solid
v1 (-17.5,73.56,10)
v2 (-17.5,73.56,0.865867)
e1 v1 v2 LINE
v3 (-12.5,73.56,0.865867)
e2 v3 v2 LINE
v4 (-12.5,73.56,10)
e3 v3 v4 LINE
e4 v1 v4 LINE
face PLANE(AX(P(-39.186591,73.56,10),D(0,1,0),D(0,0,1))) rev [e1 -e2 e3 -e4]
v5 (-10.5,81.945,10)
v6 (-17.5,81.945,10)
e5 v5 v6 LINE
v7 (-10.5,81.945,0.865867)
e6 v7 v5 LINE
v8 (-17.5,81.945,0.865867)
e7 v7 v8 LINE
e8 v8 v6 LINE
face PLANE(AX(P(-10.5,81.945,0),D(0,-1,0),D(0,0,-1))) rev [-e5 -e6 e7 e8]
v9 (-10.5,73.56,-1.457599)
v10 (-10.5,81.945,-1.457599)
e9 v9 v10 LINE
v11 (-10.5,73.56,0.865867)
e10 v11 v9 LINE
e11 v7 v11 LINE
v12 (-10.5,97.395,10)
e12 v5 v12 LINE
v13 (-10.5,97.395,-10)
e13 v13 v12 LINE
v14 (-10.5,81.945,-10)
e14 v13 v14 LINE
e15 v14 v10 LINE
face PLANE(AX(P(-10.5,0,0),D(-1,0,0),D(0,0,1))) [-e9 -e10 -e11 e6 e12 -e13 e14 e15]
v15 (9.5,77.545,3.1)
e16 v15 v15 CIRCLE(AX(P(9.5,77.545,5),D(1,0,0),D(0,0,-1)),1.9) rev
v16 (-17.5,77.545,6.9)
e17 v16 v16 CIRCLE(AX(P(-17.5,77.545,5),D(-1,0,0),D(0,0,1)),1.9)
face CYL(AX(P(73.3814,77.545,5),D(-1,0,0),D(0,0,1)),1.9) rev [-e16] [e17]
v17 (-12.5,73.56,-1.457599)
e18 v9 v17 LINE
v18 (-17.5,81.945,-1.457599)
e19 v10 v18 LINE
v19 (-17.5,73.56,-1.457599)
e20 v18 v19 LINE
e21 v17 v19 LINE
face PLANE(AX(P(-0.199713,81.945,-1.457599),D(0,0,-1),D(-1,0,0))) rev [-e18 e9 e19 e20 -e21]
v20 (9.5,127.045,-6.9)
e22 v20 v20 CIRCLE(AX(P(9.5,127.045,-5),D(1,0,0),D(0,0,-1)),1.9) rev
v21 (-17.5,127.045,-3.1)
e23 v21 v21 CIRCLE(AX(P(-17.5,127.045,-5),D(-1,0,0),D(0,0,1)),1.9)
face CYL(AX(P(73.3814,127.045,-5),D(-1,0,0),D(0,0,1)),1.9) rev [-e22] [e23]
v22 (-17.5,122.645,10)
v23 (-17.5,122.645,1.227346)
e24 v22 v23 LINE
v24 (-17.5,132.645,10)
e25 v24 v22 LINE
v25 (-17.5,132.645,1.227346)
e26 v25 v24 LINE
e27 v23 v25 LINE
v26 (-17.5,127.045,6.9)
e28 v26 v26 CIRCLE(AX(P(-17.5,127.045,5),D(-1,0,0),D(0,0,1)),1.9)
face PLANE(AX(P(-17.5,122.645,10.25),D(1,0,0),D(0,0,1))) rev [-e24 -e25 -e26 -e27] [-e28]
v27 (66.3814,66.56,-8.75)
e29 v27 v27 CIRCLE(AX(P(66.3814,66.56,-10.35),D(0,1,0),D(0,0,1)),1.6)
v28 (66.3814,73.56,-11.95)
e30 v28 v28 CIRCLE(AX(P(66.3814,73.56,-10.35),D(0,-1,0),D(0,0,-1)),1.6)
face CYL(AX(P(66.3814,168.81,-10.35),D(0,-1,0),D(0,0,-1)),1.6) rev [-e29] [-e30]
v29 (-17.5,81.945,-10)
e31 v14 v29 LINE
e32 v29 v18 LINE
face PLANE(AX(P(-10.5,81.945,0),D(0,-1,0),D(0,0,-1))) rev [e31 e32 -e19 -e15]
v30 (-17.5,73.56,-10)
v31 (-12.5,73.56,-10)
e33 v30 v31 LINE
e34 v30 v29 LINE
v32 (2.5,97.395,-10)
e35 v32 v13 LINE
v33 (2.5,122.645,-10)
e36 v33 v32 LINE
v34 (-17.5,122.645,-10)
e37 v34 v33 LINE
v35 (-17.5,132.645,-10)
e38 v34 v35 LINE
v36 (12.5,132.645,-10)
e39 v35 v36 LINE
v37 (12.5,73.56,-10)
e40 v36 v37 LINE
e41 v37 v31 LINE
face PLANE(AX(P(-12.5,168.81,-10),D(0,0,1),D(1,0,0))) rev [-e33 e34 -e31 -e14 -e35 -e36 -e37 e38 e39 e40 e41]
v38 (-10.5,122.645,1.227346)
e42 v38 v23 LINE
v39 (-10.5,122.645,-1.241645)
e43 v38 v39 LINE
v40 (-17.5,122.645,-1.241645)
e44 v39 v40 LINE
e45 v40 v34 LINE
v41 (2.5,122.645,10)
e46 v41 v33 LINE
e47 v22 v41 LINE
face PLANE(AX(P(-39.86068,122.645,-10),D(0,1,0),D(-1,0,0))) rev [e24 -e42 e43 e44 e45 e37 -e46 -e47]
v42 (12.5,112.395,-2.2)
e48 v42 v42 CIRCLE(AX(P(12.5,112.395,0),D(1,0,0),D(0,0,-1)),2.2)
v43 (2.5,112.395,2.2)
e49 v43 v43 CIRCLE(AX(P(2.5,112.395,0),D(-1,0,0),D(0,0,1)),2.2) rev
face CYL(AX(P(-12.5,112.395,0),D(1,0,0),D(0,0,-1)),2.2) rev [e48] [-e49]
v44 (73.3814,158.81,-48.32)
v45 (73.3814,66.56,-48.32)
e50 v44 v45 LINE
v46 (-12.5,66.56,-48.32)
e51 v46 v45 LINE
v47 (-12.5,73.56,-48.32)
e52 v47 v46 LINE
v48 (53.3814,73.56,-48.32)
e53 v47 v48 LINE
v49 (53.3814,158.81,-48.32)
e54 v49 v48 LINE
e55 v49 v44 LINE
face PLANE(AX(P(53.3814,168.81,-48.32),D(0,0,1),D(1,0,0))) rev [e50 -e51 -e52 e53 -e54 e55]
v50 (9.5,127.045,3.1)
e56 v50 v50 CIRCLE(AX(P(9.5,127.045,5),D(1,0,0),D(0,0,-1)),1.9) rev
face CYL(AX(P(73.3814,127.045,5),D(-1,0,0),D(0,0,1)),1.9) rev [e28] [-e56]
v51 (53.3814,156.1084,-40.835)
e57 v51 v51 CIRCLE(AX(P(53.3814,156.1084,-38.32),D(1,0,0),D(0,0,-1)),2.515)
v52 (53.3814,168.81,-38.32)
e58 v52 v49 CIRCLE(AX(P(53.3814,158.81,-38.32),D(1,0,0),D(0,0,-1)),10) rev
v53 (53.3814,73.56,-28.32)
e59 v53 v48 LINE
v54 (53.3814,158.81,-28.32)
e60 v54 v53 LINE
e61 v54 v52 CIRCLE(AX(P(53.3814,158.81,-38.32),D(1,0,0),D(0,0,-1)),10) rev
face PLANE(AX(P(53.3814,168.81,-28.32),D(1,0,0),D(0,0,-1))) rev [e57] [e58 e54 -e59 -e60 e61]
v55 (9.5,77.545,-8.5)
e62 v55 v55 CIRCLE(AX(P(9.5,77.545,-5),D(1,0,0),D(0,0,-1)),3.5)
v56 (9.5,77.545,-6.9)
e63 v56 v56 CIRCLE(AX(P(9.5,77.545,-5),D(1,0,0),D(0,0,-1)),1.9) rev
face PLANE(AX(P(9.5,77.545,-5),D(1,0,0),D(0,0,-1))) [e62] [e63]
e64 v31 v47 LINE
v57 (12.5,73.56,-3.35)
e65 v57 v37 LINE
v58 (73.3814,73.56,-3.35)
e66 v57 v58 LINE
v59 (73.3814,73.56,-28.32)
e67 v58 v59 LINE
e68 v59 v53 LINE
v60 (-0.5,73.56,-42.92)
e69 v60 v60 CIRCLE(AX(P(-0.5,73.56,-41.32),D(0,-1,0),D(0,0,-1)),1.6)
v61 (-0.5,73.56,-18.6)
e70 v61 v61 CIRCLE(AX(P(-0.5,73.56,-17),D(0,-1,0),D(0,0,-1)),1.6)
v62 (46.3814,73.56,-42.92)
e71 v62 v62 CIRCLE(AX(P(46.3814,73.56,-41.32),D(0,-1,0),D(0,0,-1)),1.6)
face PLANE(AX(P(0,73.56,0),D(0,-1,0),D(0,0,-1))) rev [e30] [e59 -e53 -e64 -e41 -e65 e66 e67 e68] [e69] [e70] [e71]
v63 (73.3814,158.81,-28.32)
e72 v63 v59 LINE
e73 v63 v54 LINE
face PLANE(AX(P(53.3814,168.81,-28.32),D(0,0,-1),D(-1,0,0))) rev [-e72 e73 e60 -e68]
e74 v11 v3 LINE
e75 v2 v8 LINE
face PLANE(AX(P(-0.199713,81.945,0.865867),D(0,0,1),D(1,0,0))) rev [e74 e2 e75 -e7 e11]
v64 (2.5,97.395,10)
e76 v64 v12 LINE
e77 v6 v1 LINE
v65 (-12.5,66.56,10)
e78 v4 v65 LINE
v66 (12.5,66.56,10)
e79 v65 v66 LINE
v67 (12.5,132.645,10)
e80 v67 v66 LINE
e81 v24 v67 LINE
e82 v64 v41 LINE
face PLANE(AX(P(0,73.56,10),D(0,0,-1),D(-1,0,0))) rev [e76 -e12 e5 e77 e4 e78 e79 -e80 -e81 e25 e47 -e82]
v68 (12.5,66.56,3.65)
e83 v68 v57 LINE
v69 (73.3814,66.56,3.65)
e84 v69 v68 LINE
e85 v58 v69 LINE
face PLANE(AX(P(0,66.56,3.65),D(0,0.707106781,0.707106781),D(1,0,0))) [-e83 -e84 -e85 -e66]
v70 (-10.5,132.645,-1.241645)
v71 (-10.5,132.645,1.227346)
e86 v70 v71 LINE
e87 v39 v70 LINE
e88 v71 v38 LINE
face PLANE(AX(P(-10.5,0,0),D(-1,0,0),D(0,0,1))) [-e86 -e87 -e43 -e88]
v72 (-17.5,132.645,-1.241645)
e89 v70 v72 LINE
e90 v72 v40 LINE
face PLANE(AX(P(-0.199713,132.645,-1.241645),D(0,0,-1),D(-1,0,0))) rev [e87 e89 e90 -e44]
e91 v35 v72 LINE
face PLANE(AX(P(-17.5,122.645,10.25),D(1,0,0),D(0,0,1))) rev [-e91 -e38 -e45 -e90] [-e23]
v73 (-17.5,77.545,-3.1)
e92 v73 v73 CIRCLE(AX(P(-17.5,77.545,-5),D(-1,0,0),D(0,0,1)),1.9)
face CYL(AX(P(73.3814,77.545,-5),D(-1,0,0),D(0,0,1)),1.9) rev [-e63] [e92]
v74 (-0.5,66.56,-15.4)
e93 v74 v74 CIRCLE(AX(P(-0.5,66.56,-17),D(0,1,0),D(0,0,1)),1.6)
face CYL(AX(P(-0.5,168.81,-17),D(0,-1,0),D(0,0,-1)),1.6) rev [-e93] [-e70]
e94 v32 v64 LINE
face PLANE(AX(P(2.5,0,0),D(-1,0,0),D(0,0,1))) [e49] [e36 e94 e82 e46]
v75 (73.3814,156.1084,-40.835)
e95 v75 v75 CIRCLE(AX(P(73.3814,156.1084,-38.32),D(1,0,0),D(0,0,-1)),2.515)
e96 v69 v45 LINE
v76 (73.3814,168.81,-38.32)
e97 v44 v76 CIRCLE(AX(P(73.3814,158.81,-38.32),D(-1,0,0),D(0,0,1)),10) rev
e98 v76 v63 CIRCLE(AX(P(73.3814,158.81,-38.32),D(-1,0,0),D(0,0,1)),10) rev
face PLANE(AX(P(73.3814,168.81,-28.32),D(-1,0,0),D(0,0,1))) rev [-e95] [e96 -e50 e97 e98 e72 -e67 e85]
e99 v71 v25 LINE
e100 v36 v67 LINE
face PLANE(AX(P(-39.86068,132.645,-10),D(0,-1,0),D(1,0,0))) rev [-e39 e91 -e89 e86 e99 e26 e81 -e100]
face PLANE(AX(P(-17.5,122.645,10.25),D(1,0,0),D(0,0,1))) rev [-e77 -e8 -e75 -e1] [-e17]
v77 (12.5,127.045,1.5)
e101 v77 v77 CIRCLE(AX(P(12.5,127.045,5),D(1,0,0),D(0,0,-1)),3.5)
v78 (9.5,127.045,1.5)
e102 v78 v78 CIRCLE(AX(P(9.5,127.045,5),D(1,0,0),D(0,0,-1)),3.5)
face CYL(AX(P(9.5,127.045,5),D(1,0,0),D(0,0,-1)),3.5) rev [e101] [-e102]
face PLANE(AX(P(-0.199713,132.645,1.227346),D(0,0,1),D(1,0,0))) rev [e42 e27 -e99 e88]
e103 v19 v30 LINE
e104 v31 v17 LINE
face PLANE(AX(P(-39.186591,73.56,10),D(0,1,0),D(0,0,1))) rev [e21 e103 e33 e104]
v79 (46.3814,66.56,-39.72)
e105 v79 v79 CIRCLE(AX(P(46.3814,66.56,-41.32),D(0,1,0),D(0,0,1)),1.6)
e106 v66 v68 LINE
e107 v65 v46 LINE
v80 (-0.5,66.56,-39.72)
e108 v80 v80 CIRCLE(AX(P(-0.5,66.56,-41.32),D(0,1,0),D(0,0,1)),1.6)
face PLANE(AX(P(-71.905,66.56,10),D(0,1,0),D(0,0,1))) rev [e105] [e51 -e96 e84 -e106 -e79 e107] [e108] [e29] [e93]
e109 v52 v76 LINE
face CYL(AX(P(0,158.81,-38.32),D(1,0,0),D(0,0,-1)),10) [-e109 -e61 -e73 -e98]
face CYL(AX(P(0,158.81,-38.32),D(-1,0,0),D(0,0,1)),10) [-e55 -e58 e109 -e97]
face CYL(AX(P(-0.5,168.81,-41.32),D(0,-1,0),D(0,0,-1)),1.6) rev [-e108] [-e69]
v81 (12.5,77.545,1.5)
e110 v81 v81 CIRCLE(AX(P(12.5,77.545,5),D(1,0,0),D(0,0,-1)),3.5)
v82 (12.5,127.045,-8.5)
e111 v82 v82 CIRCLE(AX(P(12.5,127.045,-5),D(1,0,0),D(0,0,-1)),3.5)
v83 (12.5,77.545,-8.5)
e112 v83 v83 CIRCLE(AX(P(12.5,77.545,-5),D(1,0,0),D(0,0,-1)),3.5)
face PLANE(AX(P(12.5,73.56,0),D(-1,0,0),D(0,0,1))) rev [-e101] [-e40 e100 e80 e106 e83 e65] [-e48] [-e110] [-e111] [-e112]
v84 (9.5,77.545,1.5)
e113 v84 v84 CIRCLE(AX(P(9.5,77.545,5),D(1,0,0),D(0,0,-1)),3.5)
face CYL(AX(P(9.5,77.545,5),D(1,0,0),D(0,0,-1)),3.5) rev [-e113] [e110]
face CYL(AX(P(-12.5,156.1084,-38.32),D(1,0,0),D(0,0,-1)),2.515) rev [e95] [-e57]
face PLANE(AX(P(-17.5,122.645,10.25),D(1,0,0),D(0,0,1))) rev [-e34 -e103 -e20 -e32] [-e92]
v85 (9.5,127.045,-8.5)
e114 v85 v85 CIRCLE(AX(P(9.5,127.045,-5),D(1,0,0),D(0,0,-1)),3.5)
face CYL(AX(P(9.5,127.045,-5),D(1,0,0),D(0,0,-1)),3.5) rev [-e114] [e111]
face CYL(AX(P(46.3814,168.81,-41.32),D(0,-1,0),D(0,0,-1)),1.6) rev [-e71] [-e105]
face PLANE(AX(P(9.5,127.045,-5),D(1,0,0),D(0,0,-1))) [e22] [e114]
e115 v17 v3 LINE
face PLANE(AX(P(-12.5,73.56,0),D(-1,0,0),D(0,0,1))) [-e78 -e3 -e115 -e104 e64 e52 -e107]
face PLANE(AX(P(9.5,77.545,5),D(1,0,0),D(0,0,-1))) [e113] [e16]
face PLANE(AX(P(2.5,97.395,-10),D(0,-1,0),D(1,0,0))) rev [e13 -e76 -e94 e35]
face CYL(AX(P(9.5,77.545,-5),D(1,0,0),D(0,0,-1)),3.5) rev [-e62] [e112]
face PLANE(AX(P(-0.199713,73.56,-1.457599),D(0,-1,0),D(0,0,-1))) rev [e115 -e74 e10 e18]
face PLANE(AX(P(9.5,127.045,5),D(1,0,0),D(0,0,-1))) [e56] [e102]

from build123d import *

# Parameters (mm, degrees)
SKETCH1_W                = 25
SKETCH1_H                = 20
BOSS_EXTRUDE1_DEPTH      = 168.81
SKETCH1_W_2              = 20
BOSS_EXTRUDE1_2_DEPTH    = 168.81
CUT_EXTRUDE1_DEPTH       = 194.087721945
CUT_EXTRUDE1_DEPTH_BACK  = 194.087721945
SKETCH2_W                = 25
SKETCH2_H                = 44.708
FILLET2_R                = 10
CUT_EXTRUDE2_DEPTH       = 196.466757701
CUT_EXTRUDE2_DEPTH_BACK  = 196.466757701
SKETCH4_R                = 2.515
CUT_EXTRUDE3_DEPTH       = 186.844513952
CUT_EXTRUDE3_DEPTH_BACK  = 186.844513952
SKETCH3_R                = 2.2
SKETCH5_W                = 58.32
SKETCH5_H                = 66.56
CUT_EXTRUDE4_DEPTH       = 84.405
BOSS_EXTRUDE2_DEPTH      = 7
CHAMFER1_SIZE            = 7
SKETCH8_W                = 20
SKETCH8_H                = 13.858822584
SKETCH8_H_2              = 30.45
CUT_EXTRUDE6_DEPTH       = 2
SKETCH9_W                = 20
SKETCH9_H                = 31.847227872
CUT_EXTRUDE7_DEPTH       = 13
BOSS_EXTRUDE3_START      = -10
SKETCH10_W               = 20
SKETCH10_H               = 10
BOSS_EXTRUDE3_DEPTH      = 30
SKETCH11_W               = 20
SKETCH11_H               = 8.385
BOSS_EXTRUDE4_DEPTH      = 5
CUT_EXTRUDE8_DEPTH       = 135.813629748
CUT_EXTRUDE8_DEPTH_BACK  = 135.813629748
SKETCH12_R               = 1.6
CUT_EXTRUDE11_DEPTH      = 198.714610907
CUT_EXTRUDE11_DEPTH_BACK = 198.714610907
SKETCH13_R               = 1.9
SKETCH14_R               = 3.5
CUT_EXTRUDE12_DEPTH      = 3
CUT_EXTRUDE13_REACH      = 199.715
SKETCH16_W               = 2.468990405
SKETCH16_H               = 10
SKETCH16_W_2             = 2.323465518
SKETCH16_H_2             = 8.385


with BuildPart() as part:
    # Sketch1 → Boss-Extrude1 (new body)
    with BuildSketch(Plane(origin=(0, 0, 0), x_dir=(1, 0, 0), z_dir=(0, 1, 0))):
        Rectangle(SKETCH1_W, SKETCH1_H)
    extrude(amount=BOSS_EXTRUDE1_DEPTH)

    # Sketch2 → Cut-Extrude1 (cut, two sides: drawn at the far end of the back side and taken through both)
    with BuildSketch(Plane.XY.offset(10).offset(-CUT_EXTRUDE1_DEPTH_BACK)):
        with Locations((0, 146.456)):
            Rectangle(SKETCH2_W, SKETCH2_H)
    extrude(amount=CUT_EXTRUDE1_DEPTH + CUT_EXTRUDE1_DEPTH_BACK, mode=Mode.SUBTRACT)

    # Sketch3 → Cut-Extrude3 (cut, two sides: drawn at the far end of the back side and taken through both)
    with BuildSketch(Plane(origin=(12.5, 0, 0), x_dir=(0, 0, -1), z_dir=(1, 0, 0)).offset(-CUT_EXTRUDE3_DEPTH_BACK)):
        with Locations((0, 112.395)):
            Circle(SKETCH3_R)
    extrude(amount=CUT_EXTRUDE3_DEPTH + CUT_EXTRUDE3_DEPTH_BACK, mode=Mode.SUBTRACT)


with BuildPart() as body_2:
    # Sketch1 → Boss-Extrude1 2 (new body)
    with BuildSketch(Plane(origin=(0, 0, 0), x_dir=(1, 0, 0), z_dir=(0, 1, 0))):
        with Locations((63.3814, 38.32)):
            Rectangle(SKETCH1_W_2, SKETCH1_H)
    extrude(amount=BOSS_EXTRUDE1_2_DEPTH)

    # Fillet2
    fillet2_edges = [body_2.edges().sort_by_distance(p)[0] for p in [
        (63.3814, 168.81, -48.32),
        (63.3814, 168.81, -28.32),
    ]]
    fillet(fillet2_edges, radius=FILLET2_R - 0.0001)  # a hair under: the kernel refuses the full size

    # Sketch4 → Cut-Extrude2 (cut, two sides: drawn at the far end of the back side and taken through both)
    with BuildSketch(Plane(origin=(73.3814, 0, 0), x_dir=(0, 0, -1), z_dir=(1, 0, 0)).offset(-CUT_EXTRUDE2_DEPTH_BACK)):
        with Locations((38.32, 156.1084)):
            Circle(SKETCH4_R)
    extrude(amount=CUT_EXTRUDE2_DEPTH + CUT_EXTRUDE2_DEPTH_BACK, mode=Mode.SUBTRACT)


with BuildPart() as cut_extrude4_tool:
    # Sketch5 → Cut-Extrude4 (new, symmetric)
    with BuildSketch(Plane(origin=(12.5, 0, 0), x_dir=(0, 0, -1), z_dir=(1, 0, 0))):
        with Locations((19.16, 33.28)):
            Rectangle(SKETCH5_W, SKETCH5_H)
    extrude(amount=CUT_EXTRUDE4_DEPTH, both=True)


with BuildPart() as part_1:
    add(part.part)

    # Cut-Extrude4: cut by cut_extrude4_tool
    add(cut_extrude4_tool.part, mode=Mode.SUBTRACT)



with BuildPart() as body_2_1:
    add(body_2.part)

    # Cut-Extrude4: cut by cut_extrude4_tool
    add(cut_extrude4_tool.part, mode=Mode.SUBTRACT)


with BuildPart() as part_2:
    add(part_1.part)

    add(body_2_1.part)  # Boss-Extrude2 merges body 2
    # Sketch6 → Boss-Extrude2 (add)
    with BuildSketch(Plane.XZ.offset(-66.56)):
        Polygon((12.5, 10), (-12.5, 10), (-12.5, -48.32), (53.3814, -48.32), (53.3814, -28.32), (73.3814, -28.32), (73.3814, 3.65), (12.5, 3.65), align=None)
    extrude(amount=-BOSS_EXTRUDE2_DEPTH)

    # Chamfer1
    chamfer1_edges = [part_2.edges().sort_by_distance(p)[0] for p in [
        (42.9407, 73.56, 3.65),
    ]]
    chamfer(chamfer1_edges, length=CHAMFER1_SIZE - 0.0001)  # a hair under: the kernel refuses the full size

    # Sketch8 → Cut-Extrude6 (cut)
    with BuildSketch(Plane.ZY.offset(12.5)):
        with Locations((0, 119.324411292)):
            Rectangle(SKETCH8_W, SKETCH8_H)
        with Locations((0, 97.17)):
            Rectangle(SKETCH8_W, SKETCH8_H_2)
    extrude(amount=-CUT_EXTRUDE6_DEPTH, mode=Mode.SUBTRACT)

    # Sketch9 → Cut-Extrude7 (cut)
    with BuildSketch(Plane.ZY.offset(10.5)):
        with Locations((0, 113.318613936)):
            Rectangle(SKETCH9_W, SKETCH9_H)
    extrude(amount=-CUT_EXTRUDE7_DEPTH, mode=Mode.SUBTRACT)

    # Sketch10 → Boss-Extrude3 (add)
    with BuildSketch(Plane.ZY.offset(-2.5).offset(BOSS_EXTRUDE3_START)):
        with Locations((0, 127.645)):
            Rectangle(SKETCH10_W, SKETCH10_H)
    extrude(amount=BOSS_EXTRUDE3_DEPTH)

    # Sketch11 → Boss-Extrude4 (add)
    with BuildSketch(Plane.ZY.offset(12.5)):
        with Locations((0, 77.7525)):
            Rectangle(SKETCH11_W, SKETCH11_H)
    extrude(amount=BOSS_EXTRUDE4_DEPTH)

    # Sketch12 → Cut-Extrude8 (cut, two sides: drawn at the far end of the back side and taken through both)
    with BuildSketch(Plane.XZ.offset(-66.56).offset(-CUT_EXTRUDE8_DEPTH_BACK)):
        with Locations(Location((-0.5, -17, 0), (0, 0, 270))):
            Circle(SKETCH12_R)
        with Locations(Location((46.3814, -41.32, 0), (0, 0, 270))):
            Circle(SKETCH12_R)
        with Locations(Location((66.3814, -10.35, 0), (0, 0, 270))):
            Circle(SKETCH12_R)
        with Locations(Location((-0.5, -41.32, 0), (0, 0, 270))):
            Circle(SKETCH12_R)
    extrude(amount=CUT_EXTRUDE8_DEPTH + CUT_EXTRUDE8_DEPTH_BACK, mode=Mode.SUBTRACT)

    # Sketch13 → Cut-Extrude11 (cut, two sides: drawn at the far end of the back side and taken through both)
    with BuildSketch(Plane.ZY.offset(17.5).offset(-CUT_EXTRUDE11_DEPTH_BACK)):
        with Locations((-5, 127.045)):
            Circle(SKETCH13_R)
        with Locations((5, 127.045)):
            Circle(SKETCH13_R)
        with Locations((5, 77.545)):
            Circle(SKETCH13_R)
        with Locations((-5, 77.545)):
            Circle(SKETCH13_R)
    extrude(amount=CUT_EXTRUDE11_DEPTH + CUT_EXTRUDE11_DEPTH_BACK, mode=Mode.SUBTRACT)

    # Sketch14 → Cut-Extrude12 (cut)
    with BuildSketch(Plane(origin=(12.5, 0, 0), x_dir=(0, 0, -1), z_dir=(1, 0, 0))):
        with Locations((5, 127.045)):
            Circle(SKETCH14_R)
        with Locations((-5, 127.045)):
            Circle(SKETCH14_R)
        with Locations((-5, 77.545)):
            Circle(SKETCH14_R)
        with Locations((5, 77.545)):
            Circle(SKETCH14_R)
    extrude(amount=-CUT_EXTRUDE12_DEPTH, mode=Mode.SUBTRACT)

    # Cut-Extrude13: up to this face of the body (flat: up to its plane)
    cut_extrude13_end = Plane(part_2.part.faces().sort_by_distance((-10.5, 89.67, 0))[0])
    # Sketch16 → Cut-Extrude13 (cut, up to the picked face)
    with BuildSketch(Plane.ZY.offset(17.5), mode=Mode.PRIVATE) as cut_extrude13_sk1:
        with Locations((-0.007149366, 127.645)):
            Rectangle(SKETCH16_W, SKETCH16_H)
    cut_extrude13_tool1 = split(extrude(cut_extrude13_sk1.sketch, amount=-CUT_EXTRUDE13_REACH, mode=Mode.PRIVATE), bisect_by=cut_extrude13_end, keep=Keep.BOTH, mode=Mode.PRIVATE)
    # Sketch16 → Cut-Extrude13 (cut, up to the picked face)
    with BuildSketch(Plane.ZY.offset(17.5), mode=Mode.PRIVATE) as cut_extrude13_sk2:
        with Locations((-0.29586588, 77.7525)):
            Rectangle(SKETCH16_W_2, SKETCH16_H_2)
    cut_extrude13_tool2 = split(extrude(cut_extrude13_sk2.sketch, amount=-CUT_EXTRUDE13_REACH, mode=Mode.PRIVATE), bisect_by=cut_extrude13_end, keep=Keep.BOTH, mode=Mode.PRIVATE)
    add(cut_extrude13_tool1.solids().sort_by(Axis((-17.5, 127.645, -0.007149), (1, 0, 0)))[0], mode=Mode.SUBTRACT)
    add(cut_extrude13_tool2.solids().sort_by(Axis((-17.5, 77.7525, -0.295866), (1, 0, 0)))[0], mode=Mode.SUBTRACT)


solid = part_2.part
